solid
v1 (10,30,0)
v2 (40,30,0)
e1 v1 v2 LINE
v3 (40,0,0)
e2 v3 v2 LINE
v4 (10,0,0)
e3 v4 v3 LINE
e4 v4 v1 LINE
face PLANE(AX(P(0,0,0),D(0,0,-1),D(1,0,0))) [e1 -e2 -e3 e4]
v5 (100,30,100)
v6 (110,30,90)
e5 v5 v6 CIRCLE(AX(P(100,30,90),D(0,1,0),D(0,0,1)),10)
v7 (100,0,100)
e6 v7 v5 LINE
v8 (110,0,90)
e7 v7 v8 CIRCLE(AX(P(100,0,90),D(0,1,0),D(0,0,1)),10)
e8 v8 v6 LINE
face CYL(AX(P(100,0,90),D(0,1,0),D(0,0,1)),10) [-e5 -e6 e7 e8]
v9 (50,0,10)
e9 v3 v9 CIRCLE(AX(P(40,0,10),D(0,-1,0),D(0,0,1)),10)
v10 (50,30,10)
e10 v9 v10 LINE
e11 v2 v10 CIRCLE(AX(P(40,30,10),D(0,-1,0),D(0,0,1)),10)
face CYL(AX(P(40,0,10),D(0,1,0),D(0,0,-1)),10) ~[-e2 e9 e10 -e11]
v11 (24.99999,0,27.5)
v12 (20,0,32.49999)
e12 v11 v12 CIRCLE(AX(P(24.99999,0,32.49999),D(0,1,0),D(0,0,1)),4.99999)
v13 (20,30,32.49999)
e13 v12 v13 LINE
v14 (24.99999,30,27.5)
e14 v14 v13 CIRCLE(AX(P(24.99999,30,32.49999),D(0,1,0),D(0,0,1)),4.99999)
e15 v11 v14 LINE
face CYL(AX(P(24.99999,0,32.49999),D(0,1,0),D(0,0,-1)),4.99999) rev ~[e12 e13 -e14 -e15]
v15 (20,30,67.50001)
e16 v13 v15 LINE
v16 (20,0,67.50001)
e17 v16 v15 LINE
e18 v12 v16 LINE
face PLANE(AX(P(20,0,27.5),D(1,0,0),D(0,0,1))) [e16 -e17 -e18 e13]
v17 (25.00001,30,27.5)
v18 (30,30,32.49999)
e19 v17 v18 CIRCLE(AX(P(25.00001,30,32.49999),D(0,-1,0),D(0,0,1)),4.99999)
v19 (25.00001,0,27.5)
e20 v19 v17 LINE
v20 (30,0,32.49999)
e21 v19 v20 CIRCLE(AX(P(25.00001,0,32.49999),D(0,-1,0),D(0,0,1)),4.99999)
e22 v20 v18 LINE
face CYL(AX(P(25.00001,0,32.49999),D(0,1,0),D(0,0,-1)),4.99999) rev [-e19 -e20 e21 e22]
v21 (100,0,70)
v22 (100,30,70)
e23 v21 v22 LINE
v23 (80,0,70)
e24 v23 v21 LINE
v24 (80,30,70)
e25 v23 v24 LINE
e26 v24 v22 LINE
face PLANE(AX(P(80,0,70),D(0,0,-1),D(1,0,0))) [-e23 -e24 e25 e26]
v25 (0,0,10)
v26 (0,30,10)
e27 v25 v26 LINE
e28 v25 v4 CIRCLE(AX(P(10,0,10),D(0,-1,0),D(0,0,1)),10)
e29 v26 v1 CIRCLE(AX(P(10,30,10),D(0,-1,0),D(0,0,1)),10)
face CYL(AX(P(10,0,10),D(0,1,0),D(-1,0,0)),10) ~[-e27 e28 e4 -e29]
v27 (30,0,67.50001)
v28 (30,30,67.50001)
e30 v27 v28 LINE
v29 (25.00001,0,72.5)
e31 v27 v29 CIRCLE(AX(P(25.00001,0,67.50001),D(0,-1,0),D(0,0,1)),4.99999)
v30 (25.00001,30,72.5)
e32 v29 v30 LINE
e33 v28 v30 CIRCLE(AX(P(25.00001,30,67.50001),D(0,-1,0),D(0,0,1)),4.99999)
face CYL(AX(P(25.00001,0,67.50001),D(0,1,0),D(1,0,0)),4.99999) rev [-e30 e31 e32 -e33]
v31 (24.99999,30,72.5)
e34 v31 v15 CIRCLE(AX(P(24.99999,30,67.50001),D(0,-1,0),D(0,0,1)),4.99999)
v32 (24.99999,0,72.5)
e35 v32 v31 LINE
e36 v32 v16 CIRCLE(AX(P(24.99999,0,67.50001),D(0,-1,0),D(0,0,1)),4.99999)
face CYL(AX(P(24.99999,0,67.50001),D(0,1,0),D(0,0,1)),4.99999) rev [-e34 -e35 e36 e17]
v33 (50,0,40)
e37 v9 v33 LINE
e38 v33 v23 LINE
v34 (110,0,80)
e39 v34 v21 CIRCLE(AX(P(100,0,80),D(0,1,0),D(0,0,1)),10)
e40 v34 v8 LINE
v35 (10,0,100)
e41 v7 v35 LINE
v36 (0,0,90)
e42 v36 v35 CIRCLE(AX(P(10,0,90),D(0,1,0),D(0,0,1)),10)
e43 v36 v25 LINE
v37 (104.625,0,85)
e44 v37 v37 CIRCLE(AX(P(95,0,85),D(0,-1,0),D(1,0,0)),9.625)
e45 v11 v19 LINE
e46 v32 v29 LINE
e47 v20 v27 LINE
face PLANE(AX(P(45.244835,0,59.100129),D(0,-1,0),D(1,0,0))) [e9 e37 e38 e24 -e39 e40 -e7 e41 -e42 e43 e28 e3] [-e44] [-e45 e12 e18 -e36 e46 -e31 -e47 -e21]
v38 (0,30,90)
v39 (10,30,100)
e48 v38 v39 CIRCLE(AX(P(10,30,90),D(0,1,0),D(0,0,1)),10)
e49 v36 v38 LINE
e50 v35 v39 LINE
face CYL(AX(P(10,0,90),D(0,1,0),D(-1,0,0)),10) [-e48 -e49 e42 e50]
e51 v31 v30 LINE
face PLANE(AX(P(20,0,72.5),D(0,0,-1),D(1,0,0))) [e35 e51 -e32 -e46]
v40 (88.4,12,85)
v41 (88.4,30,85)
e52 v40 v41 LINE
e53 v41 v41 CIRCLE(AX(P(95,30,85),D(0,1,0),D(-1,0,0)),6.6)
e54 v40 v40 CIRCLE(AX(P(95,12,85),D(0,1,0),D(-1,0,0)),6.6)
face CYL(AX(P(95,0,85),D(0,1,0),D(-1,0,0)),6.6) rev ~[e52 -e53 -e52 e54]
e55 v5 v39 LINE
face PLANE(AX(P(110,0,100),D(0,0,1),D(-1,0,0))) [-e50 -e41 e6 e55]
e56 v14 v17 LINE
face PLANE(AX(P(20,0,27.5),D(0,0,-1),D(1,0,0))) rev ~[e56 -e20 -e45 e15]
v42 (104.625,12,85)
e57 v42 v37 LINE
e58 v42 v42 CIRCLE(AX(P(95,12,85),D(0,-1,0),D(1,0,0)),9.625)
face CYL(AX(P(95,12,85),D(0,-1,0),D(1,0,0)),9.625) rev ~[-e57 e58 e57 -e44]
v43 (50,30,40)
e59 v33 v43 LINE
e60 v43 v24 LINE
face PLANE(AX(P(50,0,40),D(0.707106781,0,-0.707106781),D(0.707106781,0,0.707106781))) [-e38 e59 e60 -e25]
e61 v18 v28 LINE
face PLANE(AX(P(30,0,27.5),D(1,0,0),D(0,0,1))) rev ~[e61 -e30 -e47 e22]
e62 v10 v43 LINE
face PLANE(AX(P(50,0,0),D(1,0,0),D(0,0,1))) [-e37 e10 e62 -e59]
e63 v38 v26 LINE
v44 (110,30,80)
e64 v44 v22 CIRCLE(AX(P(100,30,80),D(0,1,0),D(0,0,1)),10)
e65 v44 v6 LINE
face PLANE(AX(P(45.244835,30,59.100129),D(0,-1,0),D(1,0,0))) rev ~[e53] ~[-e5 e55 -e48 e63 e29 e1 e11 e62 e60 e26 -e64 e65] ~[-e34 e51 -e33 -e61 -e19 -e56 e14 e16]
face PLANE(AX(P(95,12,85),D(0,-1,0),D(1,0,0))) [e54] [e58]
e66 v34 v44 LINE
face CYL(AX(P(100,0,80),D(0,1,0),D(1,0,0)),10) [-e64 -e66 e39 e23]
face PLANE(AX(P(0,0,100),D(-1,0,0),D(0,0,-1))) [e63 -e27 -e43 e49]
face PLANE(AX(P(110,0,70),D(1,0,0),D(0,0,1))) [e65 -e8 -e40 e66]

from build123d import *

# Parameters (mm, degrees)
F1_DEPTH       = 30
F3_D           = 13.2
F3_CBORE_D     = 19.25
F3_CBORE_DEPTH = 12
F4_R           = 10
F5_W           = 10
F5_H           = 45
F6_DEPTH       = 30.001
F7_R           = 4.99999


# Not quite as in the source:
# - a fillet or chamfer is up to 0.001 mm smaller than in the source, because OpenCascade refuses the exact size


with BuildPart() as f1:
    # F0 (on Front) → F1 (new body)
    with BuildSketch(Plane.XZ):
        Polygon((0, 100), (0, 0), (50, 0), (50, 40), (80, 70), (110, 70), (110, 100), align=None)
    extrude(amount=-F1_DEPTH)

    # F3 (through all)
    with Locations(Plane.XZ):
        with Locations((95, 85)):
            CounterBoreHole(F3_D / 2, F3_CBORE_D / 2, F3_CBORE_DEPTH)

    # F4
    f4_edges = [f1.edges().sort_by_distance(p)[0] for p in [
        (0, 15, 100),
        (50, 15, 0),
        (110, 15, 70),
        (110, 15, 100),
        (0, 15, 0),
    ]]
    fillet(f4_edges, radius=F4_R)

    # F5 (on face) → F6 (cut, through all)
    with BuildSketch(Plane.XZ):
        with Locations((25, 50)):
            Rectangle(F5_W, F5_H)
    extrude(amount=-F6_DEPTH, mode=Mode.SUBTRACT)

    # F7 (radius 5 in the source; OpenCascade refuses exactly that, so slightly less here)
    f7_edges = [f1.edges().sort_by_distance(p)[0] for p in [
        (20, 15, 72.5),
        (30, 15, 72.5),
        (30, 15, 27.5),
        (20, 15, 27.5),
    ]]
    fillet(f7_edges, radius=F7_R)


solid = f1.part
